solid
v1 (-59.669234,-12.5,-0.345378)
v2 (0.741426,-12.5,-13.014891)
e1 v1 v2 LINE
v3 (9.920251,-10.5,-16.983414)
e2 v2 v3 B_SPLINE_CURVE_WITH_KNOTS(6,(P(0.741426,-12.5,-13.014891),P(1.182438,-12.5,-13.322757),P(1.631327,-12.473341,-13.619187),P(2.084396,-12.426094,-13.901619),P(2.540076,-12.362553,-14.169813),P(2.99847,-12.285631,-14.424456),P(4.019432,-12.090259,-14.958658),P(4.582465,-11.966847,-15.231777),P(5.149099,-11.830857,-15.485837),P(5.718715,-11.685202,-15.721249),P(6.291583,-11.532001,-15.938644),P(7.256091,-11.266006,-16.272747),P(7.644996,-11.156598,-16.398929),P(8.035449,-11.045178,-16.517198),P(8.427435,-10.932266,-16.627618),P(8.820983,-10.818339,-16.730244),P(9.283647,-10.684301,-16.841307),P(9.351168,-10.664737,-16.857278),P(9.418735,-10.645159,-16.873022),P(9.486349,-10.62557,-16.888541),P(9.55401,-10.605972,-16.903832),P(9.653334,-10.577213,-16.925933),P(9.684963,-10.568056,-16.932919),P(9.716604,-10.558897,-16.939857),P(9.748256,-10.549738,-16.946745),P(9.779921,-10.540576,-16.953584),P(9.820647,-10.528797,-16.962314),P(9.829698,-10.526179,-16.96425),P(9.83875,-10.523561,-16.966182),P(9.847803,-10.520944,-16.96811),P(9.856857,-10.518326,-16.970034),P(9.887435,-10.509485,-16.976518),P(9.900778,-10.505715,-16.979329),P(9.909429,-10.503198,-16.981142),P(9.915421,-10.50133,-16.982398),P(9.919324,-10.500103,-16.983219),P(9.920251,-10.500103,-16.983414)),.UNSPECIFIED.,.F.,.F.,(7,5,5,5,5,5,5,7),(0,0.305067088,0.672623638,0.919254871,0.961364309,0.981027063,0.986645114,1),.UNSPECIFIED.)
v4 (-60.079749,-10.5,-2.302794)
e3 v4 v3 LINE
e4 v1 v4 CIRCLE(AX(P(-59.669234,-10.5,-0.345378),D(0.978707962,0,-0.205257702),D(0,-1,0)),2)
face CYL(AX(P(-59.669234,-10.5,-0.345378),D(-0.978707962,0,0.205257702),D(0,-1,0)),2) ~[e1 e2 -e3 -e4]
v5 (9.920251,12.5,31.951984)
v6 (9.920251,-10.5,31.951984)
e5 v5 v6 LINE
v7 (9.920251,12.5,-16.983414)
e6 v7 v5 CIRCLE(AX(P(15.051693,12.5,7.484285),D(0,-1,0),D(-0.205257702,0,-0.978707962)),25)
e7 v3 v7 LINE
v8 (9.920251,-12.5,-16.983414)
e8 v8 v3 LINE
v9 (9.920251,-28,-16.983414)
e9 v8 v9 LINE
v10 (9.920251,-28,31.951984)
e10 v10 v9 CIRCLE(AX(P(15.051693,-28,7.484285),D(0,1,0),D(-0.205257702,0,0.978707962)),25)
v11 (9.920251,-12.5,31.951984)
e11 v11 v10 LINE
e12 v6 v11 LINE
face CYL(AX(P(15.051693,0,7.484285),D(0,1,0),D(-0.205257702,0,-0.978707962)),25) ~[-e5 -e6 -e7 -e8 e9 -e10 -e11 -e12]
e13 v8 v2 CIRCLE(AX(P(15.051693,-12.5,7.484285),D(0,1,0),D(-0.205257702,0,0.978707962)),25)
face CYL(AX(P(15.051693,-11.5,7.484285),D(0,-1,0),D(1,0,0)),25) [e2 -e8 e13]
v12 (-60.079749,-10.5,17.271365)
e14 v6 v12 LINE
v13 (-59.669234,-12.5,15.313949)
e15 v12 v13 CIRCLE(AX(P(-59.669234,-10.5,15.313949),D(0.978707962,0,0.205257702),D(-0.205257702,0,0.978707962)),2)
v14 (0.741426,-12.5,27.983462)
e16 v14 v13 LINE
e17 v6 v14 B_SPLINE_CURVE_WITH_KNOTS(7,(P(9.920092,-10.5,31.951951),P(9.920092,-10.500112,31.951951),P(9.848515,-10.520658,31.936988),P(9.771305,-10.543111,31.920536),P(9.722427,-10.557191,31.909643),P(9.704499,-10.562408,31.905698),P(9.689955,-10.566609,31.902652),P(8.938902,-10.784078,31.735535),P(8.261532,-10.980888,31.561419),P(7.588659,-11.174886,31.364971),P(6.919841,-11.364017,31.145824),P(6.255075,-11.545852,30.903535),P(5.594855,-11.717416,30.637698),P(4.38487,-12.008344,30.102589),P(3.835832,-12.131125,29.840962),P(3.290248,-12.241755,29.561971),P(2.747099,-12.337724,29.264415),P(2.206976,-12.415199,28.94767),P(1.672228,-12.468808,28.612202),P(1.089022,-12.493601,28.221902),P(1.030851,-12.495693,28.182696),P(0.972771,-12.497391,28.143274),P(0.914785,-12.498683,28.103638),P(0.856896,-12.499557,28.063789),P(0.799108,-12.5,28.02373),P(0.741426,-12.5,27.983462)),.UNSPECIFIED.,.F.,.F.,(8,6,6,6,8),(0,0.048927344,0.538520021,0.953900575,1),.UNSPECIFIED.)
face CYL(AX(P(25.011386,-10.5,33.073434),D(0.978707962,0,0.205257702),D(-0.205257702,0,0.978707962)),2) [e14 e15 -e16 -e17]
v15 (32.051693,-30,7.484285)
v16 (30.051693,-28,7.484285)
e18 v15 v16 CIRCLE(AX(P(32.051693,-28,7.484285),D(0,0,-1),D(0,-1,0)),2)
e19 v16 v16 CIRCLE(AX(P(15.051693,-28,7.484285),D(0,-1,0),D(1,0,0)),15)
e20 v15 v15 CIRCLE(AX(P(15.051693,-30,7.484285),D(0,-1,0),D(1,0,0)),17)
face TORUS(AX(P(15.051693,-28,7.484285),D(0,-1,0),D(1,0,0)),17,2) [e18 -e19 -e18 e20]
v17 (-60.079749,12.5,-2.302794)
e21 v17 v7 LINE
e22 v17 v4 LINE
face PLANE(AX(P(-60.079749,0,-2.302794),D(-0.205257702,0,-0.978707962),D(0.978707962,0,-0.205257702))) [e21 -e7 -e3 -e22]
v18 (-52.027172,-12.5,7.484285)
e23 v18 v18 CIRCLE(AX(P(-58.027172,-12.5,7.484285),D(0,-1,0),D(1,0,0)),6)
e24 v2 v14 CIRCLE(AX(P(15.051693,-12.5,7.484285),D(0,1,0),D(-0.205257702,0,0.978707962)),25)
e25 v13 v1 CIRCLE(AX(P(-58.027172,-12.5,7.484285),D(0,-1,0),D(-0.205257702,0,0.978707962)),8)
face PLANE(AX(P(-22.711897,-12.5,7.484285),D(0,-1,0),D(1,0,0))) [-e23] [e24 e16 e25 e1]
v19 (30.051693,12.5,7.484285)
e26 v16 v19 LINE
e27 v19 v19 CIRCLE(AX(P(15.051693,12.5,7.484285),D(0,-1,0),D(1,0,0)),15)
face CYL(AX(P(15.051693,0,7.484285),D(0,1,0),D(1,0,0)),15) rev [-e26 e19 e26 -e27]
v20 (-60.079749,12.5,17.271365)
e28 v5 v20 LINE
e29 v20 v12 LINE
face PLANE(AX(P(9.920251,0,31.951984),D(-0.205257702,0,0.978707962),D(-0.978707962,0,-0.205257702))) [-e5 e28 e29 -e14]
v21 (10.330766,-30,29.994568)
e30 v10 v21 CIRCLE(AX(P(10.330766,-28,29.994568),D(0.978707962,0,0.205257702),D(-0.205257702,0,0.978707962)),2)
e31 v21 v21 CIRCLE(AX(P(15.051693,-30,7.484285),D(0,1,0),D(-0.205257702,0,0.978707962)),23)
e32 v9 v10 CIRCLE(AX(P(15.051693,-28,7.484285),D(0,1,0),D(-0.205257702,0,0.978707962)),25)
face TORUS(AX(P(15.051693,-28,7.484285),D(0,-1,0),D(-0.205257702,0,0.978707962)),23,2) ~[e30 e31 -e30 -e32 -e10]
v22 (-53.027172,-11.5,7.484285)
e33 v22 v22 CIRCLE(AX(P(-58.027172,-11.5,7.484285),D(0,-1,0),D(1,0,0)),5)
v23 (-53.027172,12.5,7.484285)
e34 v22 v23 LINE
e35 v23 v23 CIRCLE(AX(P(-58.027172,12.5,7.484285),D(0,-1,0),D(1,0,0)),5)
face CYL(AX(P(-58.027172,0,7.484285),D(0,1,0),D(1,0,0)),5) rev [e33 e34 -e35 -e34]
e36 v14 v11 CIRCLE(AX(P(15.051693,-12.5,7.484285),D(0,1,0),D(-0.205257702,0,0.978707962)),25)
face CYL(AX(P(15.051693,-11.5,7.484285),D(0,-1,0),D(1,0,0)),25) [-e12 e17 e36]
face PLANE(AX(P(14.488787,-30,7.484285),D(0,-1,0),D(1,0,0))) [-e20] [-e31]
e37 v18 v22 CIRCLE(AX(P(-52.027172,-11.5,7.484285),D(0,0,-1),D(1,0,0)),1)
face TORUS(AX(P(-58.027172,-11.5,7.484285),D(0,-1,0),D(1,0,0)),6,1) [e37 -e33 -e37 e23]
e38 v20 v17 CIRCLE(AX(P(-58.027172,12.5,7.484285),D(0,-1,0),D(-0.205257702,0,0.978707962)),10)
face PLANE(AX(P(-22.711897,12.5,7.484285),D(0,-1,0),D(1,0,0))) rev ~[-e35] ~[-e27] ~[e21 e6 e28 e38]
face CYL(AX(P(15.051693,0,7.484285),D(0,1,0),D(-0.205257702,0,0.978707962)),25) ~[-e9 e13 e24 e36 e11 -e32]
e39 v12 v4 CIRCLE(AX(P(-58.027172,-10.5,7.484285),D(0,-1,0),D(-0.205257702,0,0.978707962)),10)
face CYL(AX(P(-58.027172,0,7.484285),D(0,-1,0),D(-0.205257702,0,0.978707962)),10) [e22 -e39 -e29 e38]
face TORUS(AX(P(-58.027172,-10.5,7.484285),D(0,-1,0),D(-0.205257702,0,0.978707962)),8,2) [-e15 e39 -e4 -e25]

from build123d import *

# Parameters (mm, degrees)
F0_R         = 15
F0_R_2       = 5
F1_DEPTH     = 12.5
F2_DEPTH     = 30
F3_T4_DEPTH  = 86.5228675813
F3_S5_R      = 25
F3_T6_DEPTH  = 45
F3_T8_ANGLE  = 156.3108298238
F3_T12_DEPTH = 86.5228675813
F3_S13_R     = 25
F3_T14_DEPTH = 45
F4_R         = 1


# Not quite as in the source:
# - a fillet or chamfer that OpenCascade refuses, or shapes differently, is made with other operations: its cross-section is extruded or revolved along the edge and cut away or added


with BuildPart() as f1:
    # F0 (on Front) → F1 (new body, symmetric)
    with BuildSketch(Plane.XZ):
        with BuildLine():
            ThreePointArc((-60.0797491716, 17.2713649638), (-51.7234339832, 15.247202645), (-48.0271721521, 7.4842853392))
            ThreePointArc((-48.0271721521, 7.4842853392), (-51.7234339832, -0.2786319667), (-60.0797491716, -2.3027942855))
            Line((-60.0797491716, -2.3027942855), (9.9202508284, -16.9834137224))
            ThreePointArc((9.9202508284, -16.9834137224), (-9.9483066228, 7.4842853392), (9.9202508284, 31.9519844007))
            Line((9.9202508284, 31.9519844007), (-60.0797491716, 17.2713649638))
        make_face()
        with BuildLine():
            ThreePointArc((40.0516933772, 7.4842853392), (30.8110387995, 26.8915786038), (9.9202508284, 31.9519844007))
            ThreePointArc((9.9202508284, 31.9519844007), (-9.9483066228, 7.4842853392), (9.9202508284, -16.9834137224))
            ThreePointArc((9.9202508284, -16.9834137224), (30.8110387995, -11.9230079255), (40.0516933772, 7.4842853392))
        make_face()
        with Locations((15.0516933772, 7.4842853392)):
            Circle(F0_R, mode=Mode.SUBTRACT)
        with BuildLine():
            ThreePointArc((-60.0797491716, -2.3027942855), (-51.7234339832, -0.2786319667), (-48.0271721521, 7.4842853392))
            ThreePointArc((-48.0271721521, 7.4842853392), (-51.7234339832, 15.247202645), (-60.0797491716, 17.2713649638))
            ThreePointArc((-60.0797491716, 17.2713649638), (-68.0271721521, 7.4842853392), (-60.0797491716, -2.3027942855))
        make_face()
        with Locations((-58.0271721521, 7.4842853392)):
            Circle(F0_R_2, mode=Mode.SUBTRACT)
    extrude(amount=F1_DEPTH, both=True)

    # F0 (on Front) → F2 (join)
    with BuildSketch(Plane.XZ):
        with BuildLine():
            ThreePointArc((40.0516933772, 7.4842853392), (30.8110387995, 26.8915786038), (9.9202508284, 31.9519844007))
            ThreePointArc((9.9202508284, 31.9519844007), (-9.9483066228, 7.4842853392), (9.9202508284, -16.9834137224))
            ThreePointArc((9.9202508284, -16.9834137224), (30.8110387995, -11.9230079255), (40.0516933772, 7.4842853392))
        make_face()
        with Locations((15.0516933772, 7.4842853392)):
            Circle(F0_R, mode=Mode.SUBTRACT)
    extrude(amount=F2_DEPTH)

    # F3: fillet of radius 2 on 5 edges, made by hand


with BuildPart() as f3_tool2:
    # F3_s3 → F3_t4 (new body)
    with BuildSketch(Plane(origin=(-57.0859435933, 0, 11.9722430442), x_dir=(0, 1, 0), z_dir=(0.9787079625, 0, -0.205257702))):
        with BuildLine():
            ThreePointArc((-12.5, -12.5855943521), (-11.9142135624, -13.9998079144), (-10.5, -14.5855943521))
            Line((-10.5, -14.5855943521), (-12.5, -14.5855943521))
            Line((-12.5, -14.5855943521), (-12.5, -12.5855943521))
        make_face()
    extrude(amount=F3_T4_DEPTH)

    # F3_s5 → F3_t6 (cut, symmetric)
    with BuildSketch(Plane.XZ.offset(11.5)):
        with Locations((15.0516933772, 7.4842853392)):
            Circle(F3_S5_R)
    extrude(amount=F3_T6_DEPTH, both=True, mode=Mode.SUBTRACT)


with BuildPart() as f1_1:
    add(f1.part)

    # F3_t1: cut F3_tool2
    add(f3_tool2.part, mode=Mode.SUBTRACT)

    # F3_s7 → F3_t8 (revolve, cut)
    with BuildSketch(Plane(origin=(-54.0789471374, 0, -11.3416063211), x_dir=(0, 1, 0), z_dir=(0.9787079625, 0, 0.205257702))):
        with BuildLine():
            ThreePointArc((-10.5, 29.2354536617), (-11.9142135624, 28.649667224), (-12.5, 27.2354536617))
            Line((-12.5, 27.2354536617), (-12.5, 29.2354536617))
            Line((-12.5, 29.2354536617), (-10.5, 29.2354536617))
        make_face()
    revolve(axis=Axis((-58.0271721521, -12.5, 7.4842853392), (0, -1, 0)), revolution_arc=F3_T8_ANGLE, mode=Mode.SUBTRACT)


with BuildPart() as f3_tool10:
    # F3_s11 → F3_t12 (new body)
    with BuildSketch(Plane(origin=(30.6016722995, 0, 6.4178786452), x_dir=(0, 1, 0), z_dir=(-0.9787079625, 0, -0.205257702))):
        with BuildLine():
            ThreePointArc((-10.5, -29.2354536617), (-11.9142135624, -28.649667224), (-12.5, -27.2354536617))
            Line((-12.5, -27.2354536617), (-12.5, -29.2354536617))
            Line((-12.5, -29.2354536617), (-10.5, -29.2354536617))
        make_face()
    extrude(amount=F3_T12_DEPTH)

    # F3_s13 → F3_t14 (cut, symmetric)
    with BuildSketch(Plane.XZ.offset(11.5)):
        with Locations((15.0516933772, 7.4842853392)):
            Circle(F3_S13_R)
    extrude(amount=F3_T14_DEPTH, both=True, mode=Mode.SUBTRACT)


with BuildPart() as f1_2:
    add(f1_1.part)

    # F3_t9: cut F3_tool10
    add(f3_tool10.part, mode=Mode.SUBTRACT)

    # F3_s15 → F3_t16 (revolve, cut)
    with BuildSketch(Plane(origin=(15.9210528626, 0, 3.3390131159), x_dir=(0, 1, 0), z_dir=(-0.9787079625, 0, -0.205257702))):
        with BuildLine():
            ThreePointArc((-28, -29.2354536617), (-29.4142135624, -28.649667224), (-30, -27.2354536617))
            Line((-30, -27.2354536617), (-30, -29.2354536617))
            Line((-30, -29.2354536617), (-28, -29.2354536617))
        make_face()
    revolve(axis=Axis((15.0516933772, -30, 7.4842853392), (0, 1, 0)), mode=Mode.SUBTRACT)

    # F3_s17 → F3_t18 (revolve, cut)
    with BuildSketch(Plane.XY.offset(7.4842853392)):
        with BuildLine():
            ThreePointArc((32.0516933772, -30), (30.6374798149, -29.4142135624), (30.0516933772, -28))
            Line((30.0516933772, -28), (30.0516933772, -30))
            Line((30.0516933772, -30), (32.0516933772, -30))
        make_face()
    revolve(axis=Axis((15.0516933772, -30, 7.4842853392), (0, -1, 0)), mode=Mode.SUBTRACT)

    # F4
    f4_edges = [f1_2.edges().sort_by_distance(p)[0] for p in [
        (-63.027172, -12.5, 7.484285),
    ]]
    fillet(f4_edges, radius=F4_R)


solid = f1_2.part
